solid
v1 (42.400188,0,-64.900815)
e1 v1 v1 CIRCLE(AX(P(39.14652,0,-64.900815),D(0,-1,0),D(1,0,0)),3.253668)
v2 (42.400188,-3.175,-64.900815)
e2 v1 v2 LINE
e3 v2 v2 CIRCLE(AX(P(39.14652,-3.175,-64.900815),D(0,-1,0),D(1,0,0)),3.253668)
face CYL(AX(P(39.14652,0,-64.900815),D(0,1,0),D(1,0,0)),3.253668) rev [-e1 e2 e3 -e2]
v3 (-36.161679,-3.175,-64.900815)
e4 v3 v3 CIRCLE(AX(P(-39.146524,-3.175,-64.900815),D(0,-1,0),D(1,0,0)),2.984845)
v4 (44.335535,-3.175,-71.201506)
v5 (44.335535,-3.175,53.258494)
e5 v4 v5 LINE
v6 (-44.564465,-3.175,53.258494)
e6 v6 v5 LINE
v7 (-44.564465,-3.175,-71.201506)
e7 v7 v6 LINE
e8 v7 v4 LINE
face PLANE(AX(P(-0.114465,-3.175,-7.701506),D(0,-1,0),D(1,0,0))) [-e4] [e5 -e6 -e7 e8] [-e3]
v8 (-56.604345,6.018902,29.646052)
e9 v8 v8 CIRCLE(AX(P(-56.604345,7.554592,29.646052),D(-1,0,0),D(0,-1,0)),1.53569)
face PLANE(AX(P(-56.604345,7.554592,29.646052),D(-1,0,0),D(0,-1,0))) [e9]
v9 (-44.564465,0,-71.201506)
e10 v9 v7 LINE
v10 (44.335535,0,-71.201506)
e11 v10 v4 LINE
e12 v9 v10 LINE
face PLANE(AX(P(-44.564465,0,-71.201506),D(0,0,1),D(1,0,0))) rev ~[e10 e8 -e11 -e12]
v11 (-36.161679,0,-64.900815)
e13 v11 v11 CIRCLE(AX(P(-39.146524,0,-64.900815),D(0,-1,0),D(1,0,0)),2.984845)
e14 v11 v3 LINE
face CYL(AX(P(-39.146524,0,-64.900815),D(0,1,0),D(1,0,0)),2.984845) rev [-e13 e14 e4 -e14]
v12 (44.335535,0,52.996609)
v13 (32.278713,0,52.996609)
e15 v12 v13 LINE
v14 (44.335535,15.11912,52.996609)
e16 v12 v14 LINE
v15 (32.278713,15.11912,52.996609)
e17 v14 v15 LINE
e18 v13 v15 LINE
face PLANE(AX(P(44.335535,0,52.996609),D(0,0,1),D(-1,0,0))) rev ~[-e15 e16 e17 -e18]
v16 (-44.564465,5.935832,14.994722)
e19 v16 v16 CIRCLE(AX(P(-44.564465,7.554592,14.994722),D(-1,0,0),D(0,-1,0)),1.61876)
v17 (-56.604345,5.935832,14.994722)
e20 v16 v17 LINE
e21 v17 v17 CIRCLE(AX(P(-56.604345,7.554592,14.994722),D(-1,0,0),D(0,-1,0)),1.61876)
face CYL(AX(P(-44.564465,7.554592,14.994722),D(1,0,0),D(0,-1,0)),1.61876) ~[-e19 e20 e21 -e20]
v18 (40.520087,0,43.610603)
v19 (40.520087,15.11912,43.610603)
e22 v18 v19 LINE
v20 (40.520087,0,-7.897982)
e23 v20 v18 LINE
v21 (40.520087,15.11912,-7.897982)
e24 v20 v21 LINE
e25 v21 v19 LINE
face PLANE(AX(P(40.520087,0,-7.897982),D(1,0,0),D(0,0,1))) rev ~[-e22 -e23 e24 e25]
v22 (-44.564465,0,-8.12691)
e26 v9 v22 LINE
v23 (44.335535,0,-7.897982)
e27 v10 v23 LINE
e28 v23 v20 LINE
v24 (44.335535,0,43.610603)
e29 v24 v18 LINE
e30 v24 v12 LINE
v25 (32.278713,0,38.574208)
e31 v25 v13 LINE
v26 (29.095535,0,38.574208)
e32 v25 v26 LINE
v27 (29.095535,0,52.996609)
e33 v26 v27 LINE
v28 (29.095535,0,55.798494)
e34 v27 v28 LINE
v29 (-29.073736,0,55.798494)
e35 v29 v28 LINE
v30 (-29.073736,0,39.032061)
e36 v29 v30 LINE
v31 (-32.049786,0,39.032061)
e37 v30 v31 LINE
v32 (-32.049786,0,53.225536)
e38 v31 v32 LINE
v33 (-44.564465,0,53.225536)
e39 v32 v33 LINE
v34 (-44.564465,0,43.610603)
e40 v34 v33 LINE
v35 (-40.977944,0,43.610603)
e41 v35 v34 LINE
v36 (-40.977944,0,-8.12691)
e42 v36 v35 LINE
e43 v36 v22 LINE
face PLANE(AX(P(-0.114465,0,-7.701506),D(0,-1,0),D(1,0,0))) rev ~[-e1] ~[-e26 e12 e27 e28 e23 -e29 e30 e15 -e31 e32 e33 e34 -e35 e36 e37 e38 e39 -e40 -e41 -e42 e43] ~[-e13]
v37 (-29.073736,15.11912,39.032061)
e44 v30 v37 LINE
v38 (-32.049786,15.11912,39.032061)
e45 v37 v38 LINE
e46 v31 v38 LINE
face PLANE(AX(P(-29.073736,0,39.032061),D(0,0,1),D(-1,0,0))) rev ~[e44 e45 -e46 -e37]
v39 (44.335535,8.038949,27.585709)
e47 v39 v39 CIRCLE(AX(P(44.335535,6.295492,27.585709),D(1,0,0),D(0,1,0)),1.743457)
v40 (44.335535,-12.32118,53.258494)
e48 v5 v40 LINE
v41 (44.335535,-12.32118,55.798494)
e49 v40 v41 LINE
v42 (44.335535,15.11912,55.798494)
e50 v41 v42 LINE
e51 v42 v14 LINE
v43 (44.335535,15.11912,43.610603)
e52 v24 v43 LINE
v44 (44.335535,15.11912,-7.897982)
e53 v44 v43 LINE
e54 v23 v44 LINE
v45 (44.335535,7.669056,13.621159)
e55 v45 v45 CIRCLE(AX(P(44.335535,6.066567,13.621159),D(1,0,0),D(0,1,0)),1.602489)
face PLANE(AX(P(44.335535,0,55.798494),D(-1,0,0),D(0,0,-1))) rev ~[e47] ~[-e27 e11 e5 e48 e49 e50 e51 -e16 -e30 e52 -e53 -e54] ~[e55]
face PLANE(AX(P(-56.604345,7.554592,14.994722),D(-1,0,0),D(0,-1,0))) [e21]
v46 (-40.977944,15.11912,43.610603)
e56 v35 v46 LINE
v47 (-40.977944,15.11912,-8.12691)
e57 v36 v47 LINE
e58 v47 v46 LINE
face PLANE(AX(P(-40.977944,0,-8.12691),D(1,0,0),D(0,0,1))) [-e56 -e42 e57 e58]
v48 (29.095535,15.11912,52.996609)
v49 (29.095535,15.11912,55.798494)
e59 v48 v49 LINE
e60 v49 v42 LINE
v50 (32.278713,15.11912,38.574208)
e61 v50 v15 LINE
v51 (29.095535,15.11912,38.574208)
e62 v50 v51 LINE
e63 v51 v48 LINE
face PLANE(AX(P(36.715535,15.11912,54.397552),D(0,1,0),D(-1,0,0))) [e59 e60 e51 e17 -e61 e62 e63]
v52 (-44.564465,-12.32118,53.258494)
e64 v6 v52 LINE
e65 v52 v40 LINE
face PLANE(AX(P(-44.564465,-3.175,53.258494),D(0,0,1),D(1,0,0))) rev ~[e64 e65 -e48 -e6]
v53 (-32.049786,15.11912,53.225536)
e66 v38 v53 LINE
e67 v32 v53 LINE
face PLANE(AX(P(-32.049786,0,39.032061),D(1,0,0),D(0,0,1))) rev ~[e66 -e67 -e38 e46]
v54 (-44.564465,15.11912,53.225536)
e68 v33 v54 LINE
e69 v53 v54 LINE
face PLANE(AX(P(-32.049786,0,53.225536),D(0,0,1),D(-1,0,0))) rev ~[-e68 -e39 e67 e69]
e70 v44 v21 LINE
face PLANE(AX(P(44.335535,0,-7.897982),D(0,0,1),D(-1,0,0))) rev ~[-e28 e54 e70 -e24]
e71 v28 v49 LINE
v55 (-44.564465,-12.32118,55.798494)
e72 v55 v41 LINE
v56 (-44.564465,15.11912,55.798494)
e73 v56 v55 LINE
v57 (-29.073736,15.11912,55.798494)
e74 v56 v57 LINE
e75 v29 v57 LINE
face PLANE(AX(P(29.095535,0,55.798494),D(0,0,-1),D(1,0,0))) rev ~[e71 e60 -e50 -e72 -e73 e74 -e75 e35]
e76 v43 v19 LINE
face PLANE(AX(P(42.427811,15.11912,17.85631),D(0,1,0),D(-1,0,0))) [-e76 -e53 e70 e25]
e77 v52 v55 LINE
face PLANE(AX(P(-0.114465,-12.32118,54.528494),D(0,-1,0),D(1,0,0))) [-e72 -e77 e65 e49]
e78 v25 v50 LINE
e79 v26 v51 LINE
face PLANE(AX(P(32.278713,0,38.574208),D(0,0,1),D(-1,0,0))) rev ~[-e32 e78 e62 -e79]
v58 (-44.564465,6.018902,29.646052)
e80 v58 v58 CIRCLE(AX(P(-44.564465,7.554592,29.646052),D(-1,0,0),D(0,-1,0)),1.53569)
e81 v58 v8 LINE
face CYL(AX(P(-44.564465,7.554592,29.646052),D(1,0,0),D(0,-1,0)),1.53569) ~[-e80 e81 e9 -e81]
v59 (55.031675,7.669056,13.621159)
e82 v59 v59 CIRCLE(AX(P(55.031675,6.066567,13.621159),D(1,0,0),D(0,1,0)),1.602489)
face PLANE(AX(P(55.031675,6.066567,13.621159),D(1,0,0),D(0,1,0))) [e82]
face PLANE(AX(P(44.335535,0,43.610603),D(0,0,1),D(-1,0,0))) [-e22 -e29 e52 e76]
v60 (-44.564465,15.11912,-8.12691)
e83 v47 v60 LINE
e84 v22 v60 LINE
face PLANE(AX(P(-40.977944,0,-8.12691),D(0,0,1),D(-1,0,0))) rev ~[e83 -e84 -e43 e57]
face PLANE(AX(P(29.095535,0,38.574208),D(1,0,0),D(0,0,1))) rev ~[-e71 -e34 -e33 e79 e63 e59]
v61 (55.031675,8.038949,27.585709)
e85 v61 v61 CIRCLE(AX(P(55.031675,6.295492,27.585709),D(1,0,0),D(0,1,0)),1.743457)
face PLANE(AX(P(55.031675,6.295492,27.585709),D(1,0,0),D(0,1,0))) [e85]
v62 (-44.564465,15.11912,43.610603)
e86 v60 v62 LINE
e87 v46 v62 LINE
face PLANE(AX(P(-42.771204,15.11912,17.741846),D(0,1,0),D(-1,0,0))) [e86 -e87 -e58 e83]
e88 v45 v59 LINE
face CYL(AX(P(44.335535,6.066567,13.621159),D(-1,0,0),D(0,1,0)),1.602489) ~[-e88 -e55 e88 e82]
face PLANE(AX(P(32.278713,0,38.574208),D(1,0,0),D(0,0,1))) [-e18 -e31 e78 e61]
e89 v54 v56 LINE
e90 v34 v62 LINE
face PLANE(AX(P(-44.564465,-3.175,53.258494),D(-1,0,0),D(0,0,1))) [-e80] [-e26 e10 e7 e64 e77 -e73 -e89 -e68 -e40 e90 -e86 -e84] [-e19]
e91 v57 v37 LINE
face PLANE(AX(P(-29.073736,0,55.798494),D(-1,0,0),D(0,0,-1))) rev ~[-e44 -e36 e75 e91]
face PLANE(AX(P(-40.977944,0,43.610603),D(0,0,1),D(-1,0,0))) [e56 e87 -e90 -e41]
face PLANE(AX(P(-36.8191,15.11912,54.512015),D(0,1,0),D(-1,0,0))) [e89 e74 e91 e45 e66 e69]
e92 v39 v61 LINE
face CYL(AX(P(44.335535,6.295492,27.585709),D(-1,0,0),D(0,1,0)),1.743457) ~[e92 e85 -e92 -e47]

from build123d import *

# Parameters (mm, degrees)
F0_W     = 88.9
F0_H     = 127
F0_R     = 2.9848451786
F0_R_2   = 3.2536679358
F1_DEPTH = 3.175
F2_W     = 88.9
F2_H     = 2.54
F3_DEPTH = 9.14618
F4_W     = 3.1831779712
F4_H     = 14.4224017859
F4_W_2   = 3.8154479831
F4_H_2   = 51.5085849911
F4_W_3   = 2.9760506004
F4_H_3   = 14.1934752464
F4_W_4   = 3.5865214437
F4_H_4   = 51.7375124618
F5_DEPTH = 15.11912
F6_R     = 1.7434569234
F6_R_2   = 1.6024885699
F7_DEPTH = 10.69614
F8_R     = 1.5356896605
F8_R_2   = 1.6187597598
F9_DEPTH = 12.03988


with BuildPart() as f1:
    # F0 (on Front) → F1 (new body)
    with BuildSketch(Plane.XZ):
        with Locations((-0.1144651324, -7.7015060779)):
            Rectangle(F0_W, F0_H)
        with Locations((-39.1465239227, -64.9008154869)):
            Circle(F0_R, mode=Mode.SUBTRACT)
        with Locations((39.1465201974, -64.9008154869)):
            Circle(F0_R_2, mode=Mode.SUBTRACT)
    extrude(amount=F1_DEPTH)

    # F2 (on face) → F3 (join)
    with BuildSketch(Plane.XZ.offset(3.175)):
        with Locations((-0.1144651324, 54.5284939221)):
            Rectangle(F2_W, F2_H)
    extrude(amount=F3_DEPTH)

    # F4 (on face) → F5 (join)
    with BuildSketch(Plane(origin=(0, 0, 0), x_dir=(-1, 0, 0), z_dir=(0, 1, 0))):
        Polygon((-29.0955348676, 55.4166970754), (-29.0955348676, 55.7984939221), (-44.3355348676, 55.7984939221), (-44.3355348676, 55.4166970754), (-44.3355348676, 52.99660936), (-32.2787128389, 52.99660936), (-29.0955348676, 52.99660936), align=None)
        with Locations((-30.6871238533, 45.7854084671)):
            Rectangle(F4_W, F4_H)
        with Locations((-42.4278108761, 17.8563101217)):
            Rectangle(F4_W_2, F4_H_2)
        Polygon((44.5644651324, 55.7984939221), (29.0737356991, 55.7984939221), (29.0737356991, 53.2255358994), (32.0497862995, 53.2255358994), (40.7490134239, 53.2255358994), (44.5644651324, 53.2255358994), align=None)
        with Locations((30.5617609993, 46.1287982762)):
            Rectangle(F4_W_3, F4_H_3)
        with Locations((42.7712044105, 17.7418463863)):
            Rectangle(F4_W_4, F4_H_4)
    extrude(amount=F5_DEPTH)

    # F6 (on face) → F7 (join)
    with BuildSketch(Plane.YZ.offset(44.3355348676)):
        with Locations((6.2954924069, 27.5857094675)):
            Circle(F6_R)
        with Locations((6.0665672645, 13.6211588979)):
            Circle(F6_R_2)
    extrude(amount=F7_DEPTH)

    # F8 (on face) → F9 (join)
    with BuildSketch(Plane(origin=(-44.5644651324, 0, 0), x_dir=(0, -1, 0), z_dir=(-1, 0, 0))):
        with Locations((-7.554592099, 29.6460520476)):
            Circle(F8_R)
        with Locations((-7.554592099, 14.9947218597)):
            Circle(F8_R_2)
    extrude(amount=F9_DEPTH)


solid = f1.part
